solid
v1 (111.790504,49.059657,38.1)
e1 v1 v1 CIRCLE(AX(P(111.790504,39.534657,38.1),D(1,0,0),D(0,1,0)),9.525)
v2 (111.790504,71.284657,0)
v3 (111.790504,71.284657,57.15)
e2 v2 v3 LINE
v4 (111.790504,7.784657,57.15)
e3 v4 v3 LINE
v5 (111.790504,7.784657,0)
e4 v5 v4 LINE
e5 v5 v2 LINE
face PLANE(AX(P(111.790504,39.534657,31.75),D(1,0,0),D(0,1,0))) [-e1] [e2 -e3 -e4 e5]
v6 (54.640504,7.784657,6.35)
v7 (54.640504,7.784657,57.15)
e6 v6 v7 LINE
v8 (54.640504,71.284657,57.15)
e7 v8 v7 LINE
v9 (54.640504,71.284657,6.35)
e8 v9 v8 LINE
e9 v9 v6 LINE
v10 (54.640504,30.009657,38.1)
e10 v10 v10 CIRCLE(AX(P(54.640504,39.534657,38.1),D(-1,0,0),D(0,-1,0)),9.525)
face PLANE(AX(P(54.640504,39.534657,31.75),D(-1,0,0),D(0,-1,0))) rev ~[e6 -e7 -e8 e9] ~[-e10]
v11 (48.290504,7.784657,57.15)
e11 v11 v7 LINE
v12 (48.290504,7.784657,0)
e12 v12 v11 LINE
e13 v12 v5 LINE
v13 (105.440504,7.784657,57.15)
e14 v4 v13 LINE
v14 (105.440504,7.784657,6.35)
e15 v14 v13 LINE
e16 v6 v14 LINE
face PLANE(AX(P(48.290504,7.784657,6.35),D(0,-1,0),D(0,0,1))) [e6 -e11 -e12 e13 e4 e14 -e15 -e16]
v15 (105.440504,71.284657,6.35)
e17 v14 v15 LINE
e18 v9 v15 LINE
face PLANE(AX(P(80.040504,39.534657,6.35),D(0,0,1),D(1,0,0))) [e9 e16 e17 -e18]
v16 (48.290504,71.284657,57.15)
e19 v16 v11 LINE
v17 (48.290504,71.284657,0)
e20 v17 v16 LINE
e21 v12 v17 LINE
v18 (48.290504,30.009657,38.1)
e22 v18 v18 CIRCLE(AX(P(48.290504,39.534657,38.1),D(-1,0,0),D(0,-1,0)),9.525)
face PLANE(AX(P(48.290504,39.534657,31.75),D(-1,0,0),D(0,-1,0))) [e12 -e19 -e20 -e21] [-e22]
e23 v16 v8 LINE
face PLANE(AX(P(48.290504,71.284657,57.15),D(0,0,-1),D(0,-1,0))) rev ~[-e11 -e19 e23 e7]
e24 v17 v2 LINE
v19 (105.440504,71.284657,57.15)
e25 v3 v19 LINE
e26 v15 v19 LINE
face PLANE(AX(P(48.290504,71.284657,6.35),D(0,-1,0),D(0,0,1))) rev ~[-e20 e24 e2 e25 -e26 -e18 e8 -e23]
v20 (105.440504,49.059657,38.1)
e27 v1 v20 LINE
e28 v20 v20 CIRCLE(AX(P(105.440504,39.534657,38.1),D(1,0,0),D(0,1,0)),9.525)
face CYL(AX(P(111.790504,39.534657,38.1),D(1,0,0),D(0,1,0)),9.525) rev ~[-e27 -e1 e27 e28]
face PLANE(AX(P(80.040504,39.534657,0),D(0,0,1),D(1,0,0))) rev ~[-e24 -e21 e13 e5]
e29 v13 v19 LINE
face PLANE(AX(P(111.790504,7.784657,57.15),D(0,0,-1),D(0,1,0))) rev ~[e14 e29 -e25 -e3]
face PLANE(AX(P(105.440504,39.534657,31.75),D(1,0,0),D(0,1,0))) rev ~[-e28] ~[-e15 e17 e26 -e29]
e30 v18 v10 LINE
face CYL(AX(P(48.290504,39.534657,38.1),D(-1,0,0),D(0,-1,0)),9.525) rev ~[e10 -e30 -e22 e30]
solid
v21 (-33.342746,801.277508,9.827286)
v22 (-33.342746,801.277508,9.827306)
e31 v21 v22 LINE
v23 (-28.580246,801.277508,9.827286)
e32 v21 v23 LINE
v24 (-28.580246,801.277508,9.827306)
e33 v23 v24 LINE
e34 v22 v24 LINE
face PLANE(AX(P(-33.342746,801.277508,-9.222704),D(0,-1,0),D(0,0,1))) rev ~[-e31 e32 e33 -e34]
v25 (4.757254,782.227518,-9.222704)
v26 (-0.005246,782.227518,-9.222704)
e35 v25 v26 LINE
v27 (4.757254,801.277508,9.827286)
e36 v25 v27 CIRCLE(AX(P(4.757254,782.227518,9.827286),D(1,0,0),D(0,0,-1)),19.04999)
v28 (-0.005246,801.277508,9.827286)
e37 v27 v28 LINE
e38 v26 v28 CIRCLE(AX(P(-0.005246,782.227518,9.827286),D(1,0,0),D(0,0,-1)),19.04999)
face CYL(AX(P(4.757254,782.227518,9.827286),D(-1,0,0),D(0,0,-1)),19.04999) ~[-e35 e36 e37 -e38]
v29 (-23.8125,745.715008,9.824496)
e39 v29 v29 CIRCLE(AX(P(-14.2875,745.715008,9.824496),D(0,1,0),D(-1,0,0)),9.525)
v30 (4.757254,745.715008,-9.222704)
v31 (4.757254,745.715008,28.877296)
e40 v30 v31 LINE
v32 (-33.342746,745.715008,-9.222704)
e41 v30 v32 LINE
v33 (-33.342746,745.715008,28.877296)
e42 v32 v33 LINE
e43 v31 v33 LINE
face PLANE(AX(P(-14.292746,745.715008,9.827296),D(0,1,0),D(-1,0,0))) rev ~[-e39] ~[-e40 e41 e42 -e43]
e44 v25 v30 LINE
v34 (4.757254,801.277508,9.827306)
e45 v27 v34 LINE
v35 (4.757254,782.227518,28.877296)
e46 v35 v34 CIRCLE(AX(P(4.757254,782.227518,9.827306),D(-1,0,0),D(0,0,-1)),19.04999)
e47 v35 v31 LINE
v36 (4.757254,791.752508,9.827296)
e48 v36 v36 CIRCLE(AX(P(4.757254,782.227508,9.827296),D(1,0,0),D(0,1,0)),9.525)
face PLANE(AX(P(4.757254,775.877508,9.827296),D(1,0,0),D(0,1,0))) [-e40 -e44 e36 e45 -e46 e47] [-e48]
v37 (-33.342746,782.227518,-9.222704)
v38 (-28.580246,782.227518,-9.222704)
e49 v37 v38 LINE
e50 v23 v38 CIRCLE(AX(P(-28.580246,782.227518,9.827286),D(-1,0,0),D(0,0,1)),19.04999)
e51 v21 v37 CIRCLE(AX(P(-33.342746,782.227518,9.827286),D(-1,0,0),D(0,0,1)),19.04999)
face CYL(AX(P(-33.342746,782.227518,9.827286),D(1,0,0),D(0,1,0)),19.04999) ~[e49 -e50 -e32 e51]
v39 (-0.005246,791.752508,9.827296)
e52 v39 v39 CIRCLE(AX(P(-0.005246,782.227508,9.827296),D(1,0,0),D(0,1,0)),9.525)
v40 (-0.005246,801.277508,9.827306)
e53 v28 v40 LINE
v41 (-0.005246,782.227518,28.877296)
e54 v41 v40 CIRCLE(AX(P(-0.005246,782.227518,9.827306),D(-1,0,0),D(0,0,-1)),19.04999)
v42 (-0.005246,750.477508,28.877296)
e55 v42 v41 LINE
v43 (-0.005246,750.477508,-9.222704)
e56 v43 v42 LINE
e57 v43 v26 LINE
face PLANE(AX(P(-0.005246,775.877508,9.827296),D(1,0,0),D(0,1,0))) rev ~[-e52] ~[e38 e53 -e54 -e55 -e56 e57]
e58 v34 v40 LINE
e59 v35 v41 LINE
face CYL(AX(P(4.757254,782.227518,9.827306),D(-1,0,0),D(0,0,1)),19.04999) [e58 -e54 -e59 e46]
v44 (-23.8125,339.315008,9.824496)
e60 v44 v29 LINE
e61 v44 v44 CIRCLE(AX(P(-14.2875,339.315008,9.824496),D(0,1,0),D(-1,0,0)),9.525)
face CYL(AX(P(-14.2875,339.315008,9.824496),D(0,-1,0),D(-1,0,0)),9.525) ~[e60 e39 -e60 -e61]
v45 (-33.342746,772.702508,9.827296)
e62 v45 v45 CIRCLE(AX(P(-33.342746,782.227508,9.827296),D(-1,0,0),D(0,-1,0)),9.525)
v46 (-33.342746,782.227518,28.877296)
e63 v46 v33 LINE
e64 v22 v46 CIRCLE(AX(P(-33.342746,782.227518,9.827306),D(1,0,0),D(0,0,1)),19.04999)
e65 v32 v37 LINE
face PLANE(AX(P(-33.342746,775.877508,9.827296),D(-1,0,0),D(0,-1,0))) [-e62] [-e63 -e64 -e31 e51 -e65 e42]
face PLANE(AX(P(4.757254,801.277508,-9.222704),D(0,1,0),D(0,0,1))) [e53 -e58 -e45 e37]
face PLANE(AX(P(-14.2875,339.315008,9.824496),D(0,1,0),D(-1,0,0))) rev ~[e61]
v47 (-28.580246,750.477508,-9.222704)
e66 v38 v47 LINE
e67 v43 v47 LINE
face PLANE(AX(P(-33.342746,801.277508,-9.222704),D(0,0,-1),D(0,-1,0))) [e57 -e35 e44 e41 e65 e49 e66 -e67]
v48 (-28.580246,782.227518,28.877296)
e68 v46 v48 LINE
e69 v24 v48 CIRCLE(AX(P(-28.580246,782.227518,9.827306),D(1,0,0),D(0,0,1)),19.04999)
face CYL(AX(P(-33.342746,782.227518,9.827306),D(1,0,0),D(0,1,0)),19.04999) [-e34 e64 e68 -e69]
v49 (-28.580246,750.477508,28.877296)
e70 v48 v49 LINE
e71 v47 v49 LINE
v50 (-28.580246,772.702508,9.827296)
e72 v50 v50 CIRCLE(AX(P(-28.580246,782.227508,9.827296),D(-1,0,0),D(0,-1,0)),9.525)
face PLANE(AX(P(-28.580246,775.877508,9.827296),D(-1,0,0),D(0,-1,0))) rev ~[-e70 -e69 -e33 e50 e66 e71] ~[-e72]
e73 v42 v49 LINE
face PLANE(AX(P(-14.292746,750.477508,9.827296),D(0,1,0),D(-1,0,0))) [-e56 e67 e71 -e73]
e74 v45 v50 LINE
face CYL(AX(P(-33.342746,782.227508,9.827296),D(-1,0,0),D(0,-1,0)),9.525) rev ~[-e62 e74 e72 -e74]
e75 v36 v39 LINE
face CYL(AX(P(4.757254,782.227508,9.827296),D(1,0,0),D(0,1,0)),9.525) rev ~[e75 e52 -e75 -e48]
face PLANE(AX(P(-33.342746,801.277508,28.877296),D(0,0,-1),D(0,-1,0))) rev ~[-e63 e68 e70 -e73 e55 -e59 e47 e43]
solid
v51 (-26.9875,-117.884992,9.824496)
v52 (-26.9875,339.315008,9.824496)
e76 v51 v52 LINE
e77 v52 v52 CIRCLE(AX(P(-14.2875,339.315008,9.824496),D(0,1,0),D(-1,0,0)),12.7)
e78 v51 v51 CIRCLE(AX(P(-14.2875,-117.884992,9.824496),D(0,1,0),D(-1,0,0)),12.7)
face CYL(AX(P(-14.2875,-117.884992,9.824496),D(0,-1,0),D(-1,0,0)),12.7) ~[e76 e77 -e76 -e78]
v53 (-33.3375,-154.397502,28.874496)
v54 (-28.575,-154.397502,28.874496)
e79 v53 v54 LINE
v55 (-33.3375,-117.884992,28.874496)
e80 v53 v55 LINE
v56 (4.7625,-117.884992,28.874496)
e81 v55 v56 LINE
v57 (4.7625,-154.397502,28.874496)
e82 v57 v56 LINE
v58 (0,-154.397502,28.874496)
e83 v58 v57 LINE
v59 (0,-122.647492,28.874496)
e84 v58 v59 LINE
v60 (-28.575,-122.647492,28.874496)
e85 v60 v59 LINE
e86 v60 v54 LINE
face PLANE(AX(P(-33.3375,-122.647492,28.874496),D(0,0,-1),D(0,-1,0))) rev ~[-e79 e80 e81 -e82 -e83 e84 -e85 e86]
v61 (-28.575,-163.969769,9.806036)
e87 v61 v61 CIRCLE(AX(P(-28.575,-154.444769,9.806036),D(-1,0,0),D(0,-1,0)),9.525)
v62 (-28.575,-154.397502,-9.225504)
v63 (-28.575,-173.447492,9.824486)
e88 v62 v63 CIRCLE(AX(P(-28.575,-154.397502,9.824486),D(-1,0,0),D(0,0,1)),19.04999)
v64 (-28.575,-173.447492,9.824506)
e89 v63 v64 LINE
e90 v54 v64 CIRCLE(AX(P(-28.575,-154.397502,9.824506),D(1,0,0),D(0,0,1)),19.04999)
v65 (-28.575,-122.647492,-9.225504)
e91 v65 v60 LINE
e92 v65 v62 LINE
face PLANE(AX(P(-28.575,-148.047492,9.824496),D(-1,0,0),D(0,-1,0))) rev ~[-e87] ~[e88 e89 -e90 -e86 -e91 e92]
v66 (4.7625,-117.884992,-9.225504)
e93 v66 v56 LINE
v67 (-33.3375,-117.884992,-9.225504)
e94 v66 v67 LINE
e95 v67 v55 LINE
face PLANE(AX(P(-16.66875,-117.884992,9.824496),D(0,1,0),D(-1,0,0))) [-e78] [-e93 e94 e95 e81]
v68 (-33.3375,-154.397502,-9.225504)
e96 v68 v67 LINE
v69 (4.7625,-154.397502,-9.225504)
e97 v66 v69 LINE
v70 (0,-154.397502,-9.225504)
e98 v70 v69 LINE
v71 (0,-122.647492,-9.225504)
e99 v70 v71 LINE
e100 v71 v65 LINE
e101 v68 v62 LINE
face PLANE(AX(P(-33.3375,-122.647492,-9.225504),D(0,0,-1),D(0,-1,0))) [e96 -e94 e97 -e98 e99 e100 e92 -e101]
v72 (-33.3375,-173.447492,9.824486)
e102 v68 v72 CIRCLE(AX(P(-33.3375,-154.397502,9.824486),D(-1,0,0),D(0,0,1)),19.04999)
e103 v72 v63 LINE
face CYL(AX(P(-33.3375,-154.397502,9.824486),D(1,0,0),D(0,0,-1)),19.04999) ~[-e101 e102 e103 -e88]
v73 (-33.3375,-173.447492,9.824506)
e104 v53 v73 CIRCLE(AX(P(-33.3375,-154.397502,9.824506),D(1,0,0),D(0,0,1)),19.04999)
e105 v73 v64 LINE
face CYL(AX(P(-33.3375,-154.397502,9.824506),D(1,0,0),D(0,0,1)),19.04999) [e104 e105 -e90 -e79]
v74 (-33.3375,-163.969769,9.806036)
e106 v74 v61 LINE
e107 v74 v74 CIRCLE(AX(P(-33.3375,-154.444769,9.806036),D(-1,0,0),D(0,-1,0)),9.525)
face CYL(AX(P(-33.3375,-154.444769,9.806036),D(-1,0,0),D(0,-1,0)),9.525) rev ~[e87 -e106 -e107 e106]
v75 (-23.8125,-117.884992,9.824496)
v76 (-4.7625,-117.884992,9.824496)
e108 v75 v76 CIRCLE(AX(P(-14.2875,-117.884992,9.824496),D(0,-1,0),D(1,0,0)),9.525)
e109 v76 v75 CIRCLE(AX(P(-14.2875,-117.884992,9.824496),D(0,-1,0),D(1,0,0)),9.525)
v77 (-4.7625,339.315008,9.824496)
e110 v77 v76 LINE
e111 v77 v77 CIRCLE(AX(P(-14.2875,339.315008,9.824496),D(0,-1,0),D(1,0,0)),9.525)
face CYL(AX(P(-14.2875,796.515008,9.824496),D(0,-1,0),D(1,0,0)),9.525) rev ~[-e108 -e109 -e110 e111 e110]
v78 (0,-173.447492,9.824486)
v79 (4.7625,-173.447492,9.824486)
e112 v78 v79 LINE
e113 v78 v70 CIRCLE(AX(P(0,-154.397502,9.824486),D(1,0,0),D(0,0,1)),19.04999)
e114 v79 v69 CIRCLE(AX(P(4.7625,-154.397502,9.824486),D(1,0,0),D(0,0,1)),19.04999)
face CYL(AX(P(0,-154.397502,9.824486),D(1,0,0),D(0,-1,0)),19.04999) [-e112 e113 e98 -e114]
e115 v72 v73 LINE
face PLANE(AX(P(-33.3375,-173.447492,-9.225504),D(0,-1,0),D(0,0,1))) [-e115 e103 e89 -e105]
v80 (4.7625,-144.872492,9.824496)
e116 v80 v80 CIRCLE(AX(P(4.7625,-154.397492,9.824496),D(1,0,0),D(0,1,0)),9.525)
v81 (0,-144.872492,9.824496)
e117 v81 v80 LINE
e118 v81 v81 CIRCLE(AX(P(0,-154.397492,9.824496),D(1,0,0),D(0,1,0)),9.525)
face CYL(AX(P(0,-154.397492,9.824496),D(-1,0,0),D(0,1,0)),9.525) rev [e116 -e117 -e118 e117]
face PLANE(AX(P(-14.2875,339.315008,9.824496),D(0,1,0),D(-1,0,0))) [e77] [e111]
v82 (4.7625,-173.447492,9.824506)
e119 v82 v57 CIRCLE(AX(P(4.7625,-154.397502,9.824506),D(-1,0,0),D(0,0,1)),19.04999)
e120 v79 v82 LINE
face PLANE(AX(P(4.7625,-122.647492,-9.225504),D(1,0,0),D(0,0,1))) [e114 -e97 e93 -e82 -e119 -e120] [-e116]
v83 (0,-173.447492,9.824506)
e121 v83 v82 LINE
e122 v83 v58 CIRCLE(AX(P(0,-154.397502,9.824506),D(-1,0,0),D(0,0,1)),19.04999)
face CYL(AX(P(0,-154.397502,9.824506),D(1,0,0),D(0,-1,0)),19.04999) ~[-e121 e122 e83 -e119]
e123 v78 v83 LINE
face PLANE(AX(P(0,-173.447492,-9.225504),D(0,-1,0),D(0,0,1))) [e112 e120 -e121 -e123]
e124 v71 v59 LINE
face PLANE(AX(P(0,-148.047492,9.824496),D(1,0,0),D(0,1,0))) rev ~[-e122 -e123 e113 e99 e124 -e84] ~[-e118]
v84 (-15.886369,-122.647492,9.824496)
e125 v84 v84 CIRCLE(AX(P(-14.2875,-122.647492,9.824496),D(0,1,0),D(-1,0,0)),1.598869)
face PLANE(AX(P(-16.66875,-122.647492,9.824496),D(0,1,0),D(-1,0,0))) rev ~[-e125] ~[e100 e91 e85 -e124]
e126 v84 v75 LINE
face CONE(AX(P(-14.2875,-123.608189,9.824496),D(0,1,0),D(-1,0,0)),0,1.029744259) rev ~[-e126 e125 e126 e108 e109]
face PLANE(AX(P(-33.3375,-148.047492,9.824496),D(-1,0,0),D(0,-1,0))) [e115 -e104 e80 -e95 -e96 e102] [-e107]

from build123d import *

# Parameters (mm, degrees)
F0_W      = 50.8
F0_H      = 38.1
F0_R      = 9.525
F1_DEPTH  = 4.7625
F2_R      = 19.04999
F3_W      = 33.3375
F3_H      = 38.1
F3_W_2    = 4.7625
F4_DEPTH  = 4.7625
F5_W      = 50.8
F5_H      = 38.1
F5_R      = 9.525
F6_DEPTH  = 4.7625
F7_R      = 19.04999
F8_R      = 12.7
F9_DEPTH  = 457.2
F11_D     = 19.05
F11_DEPTH = 457.2
F11_TIP   = 5.7231973962
F12_R     = 9.525
F13_DEPTH = 406.4
F14_W     = 38.1
F14_H     = 38.1
F14_R     = 9.525
F15_DEPTH = 4.7625
F16_W     = 50.8
F16_H     = 38.1
F16_R     = 9.525
F17_DEPTH = 4.7625
F18_R     = 19.04999
F19_W     = 50.8
F19_H     = 38.1
F19_R     = 9.525
F20_DEPTH = 4.7625
F21_R     = 19.04999
F22_W     = 63.5
F22_H     = 63.5
F23_DEPTH = 6.35
F24_W     = 63.5
F24_H     = 50.8
F24_R     = 9.525
F25_DEPTH = 6.35
F26_W     = 63.5
F26_H     = 50.8
F26_R     = 9.525
F27_DEPTH = 6.35


# Not quite as in the source:
# - a fillet or chamfer is up to 0.001 mm smaller than in the source, because OpenCascade refuses the exact size


with BuildPart() as f1:
    # F0 (on Right) → F1 (new body)
    with BuildSketch(Plane.YZ):
        with Locations((-148.0474919081, 9.8244957626)):
            Rectangle(F0_W, F0_H)
        with Locations((-154.3974919081, 9.8244957626)):
            Circle(F0_R, mode=Mode.SUBTRACT)
    extrude(amount=F1_DEPTH)

    # F2 (radius 19.05 in the source; OpenCascade refuses exactly that, so slightly less here)
    f2_edges = [f1.edges().sort_by_distance(p)[0] for p in [
        (2.38125, -173.447492, 28.874496),
        (2.38125, -173.447492, -9.225504),
    ]]
    fillet(f2_edges, radius=F2_R)

    # F3 (on face) → F4 (join)
    with BuildSketch(Plane(origin=(0, -122.6474919081, 0), x_dir=(-1, 0, 0), z_dir=(0, 1, 0))):
        with Locations((16.66875, 9.8244957626)):
            Rectangle(F3_W, F3_H)
        with Locations((-2.38125, 9.8244957626)):
            Rectangle(F3_W_2, F3_H)
    extrude(amount=F4_DEPTH)

    # F5 (on face) → F6 (join)
    with BuildSketch(Plane(origin=(-33.3375, 0, 0), x_dir=(0, -1, 0), z_dir=(-1, 0, 0))):
        with Locations((148.0474919081, 9.8244957626)):
            Rectangle(F5_W, F5_H)
        with Locations((154.4447690248, 9.8060360178)):
            Circle(F5_R, mode=Mode.SUBTRACT)
    extrude(amount=-F6_DEPTH)

    # F7 (radius 19.05 in the source; OpenCascade refuses exactly that, so slightly less here)
    f7_edges = [f1.edges().sort_by_distance(p)[0] for p in [
        (-30.95625, -173.447492, 28.874496),
        (-30.95625, -173.447492, -9.225504),
    ]]
    fillet(f7_edges, radius=F7_R)

    # F8 (on face) → F9 (join)
    with BuildSketch(Plane(origin=(0, -117.8849919081, 0), x_dir=(-1, 0, 0), z_dir=(0, 1, 0))):
        with Locations((14.2875, 9.8244957626)):
            Circle(F8_R)
    extrude(amount=F9_DEPTH)

    # F11
    with Locations(Plane(origin=(0, 339.3150080919, 0), x_dir=(-1, 0, 0), z_dir=(0, 1, 0))):
        with Locations((14.2875, 9.8244957626)):
            Hole(F11_D / 2, depth=F11_DEPTH)
            with Locations((0, 0, -(F11_DEPTH + F11_TIP / 2))):  # 118° drill point
                Cone(0, F11_D / 2, F11_TIP, mode=Mode.SUBTRACT)


with BuildPart() as f13:
    # F12 (on face) → F13 (new body)
    with BuildSketch(Plane(origin=(0, 339.3150080919, 0), x_dir=(-1, 0, 0), z_dir=(0, 1, 0))):
        with Locations((14.2875, 9.8244957626)):
            Circle(F12_R)
    extrude(amount=F13_DEPTH)

    # F14 (on face) → F15 (join)
    with BuildSketch(Plane(origin=(0, 745.7150080919, 0), x_dir=(-1, 0, 0), z_dir=(0, 1, 0))):
        with Locations((14.2927456155, 9.8272960141)):
            Rectangle(F14_W, F14_H)
        with Locations((14.2875, 9.8244957626)):
            Circle(F14_R, mode=Mode.SUBTRACT)
        with Locations((14.2875, 9.8244957626)):
            Circle(F14_R)
    extrude(amount=F15_DEPTH)

    # F16 (on face) → F17 (join)
    with BuildSketch(Plane.YZ.offset(4.7572543845)):
        with Locations((775.8775080919, 9.8272960141)):
            Rectangle(F16_W, F16_H)
        with Locations((782.2275080919, 9.8272960141)):
            Circle(F16_R, mode=Mode.SUBTRACT)
    extrude(amount=-F17_DEPTH)

    # F18 (radius 19.05 in the source; OpenCascade refuses exactly that, so slightly less here)
    f18_edges = [f13.edges().sort_by_distance(p)[0] for p in [
        (2.376004, 801.277508, 28.877296),
        (2.376004, 801.277508, -9.222704),
    ]]
    fillet(f18_edges, radius=F18_R)

    # F19 (on face) → F20 (join)
    with BuildSketch(Plane(origin=(-33.3427456155, 0, 0), x_dir=(0, -1, 0), z_dir=(-1, 0, 0))):
        with Locations((-775.8775080919, 9.8272960141)):
            Rectangle(F19_W, F19_H)
        with Locations((-782.2275080919, 9.8272960141)):
            Circle(F19_R, mode=Mode.SUBTRACT)
    extrude(amount=-F20_DEPTH)

    # F21 (radius 19.05 in the source; OpenCascade refuses exactly that, so slightly less here)
    f21_edges = [f13.edges().sort_by_distance(p)[0] for p in [
        (-30.961496, 801.277508, 28.877296),
        (-30.961496, 801.277508, -9.222704),
    ]]
    fillet(f21_edges, radius=F21_R)


with BuildPart() as f23:
    # F22 (on Top) → F23 (new body)
    with BuildSketch(Plane.XY):
        with Locations((80.0405043066, 39.5346571803)):
            Rectangle(F22_W, F22_H)
    extrude(amount=F23_DEPTH)

    # F24 (on face) → F25 (join)
    with BuildSketch(Plane.YZ.offset(111.7905043066)):
        with Locations((39.5346571803, 31.75)):
            Rectangle(F24_W, F24_H)
        with Locations((39.5346571803, 38.1)):
            Circle(F24_R, mode=Mode.SUBTRACT)
    extrude(amount=-F25_DEPTH)

    # F26 (on face) → F27 (join)
    with BuildSketch(Plane(origin=(48.2905043066, 0, 0), x_dir=(0, -1, 0), z_dir=(-1, 0, 0))):
        with Locations((-39.5346571803, 31.75)):
            Rectangle(F26_W, F26_H)
        with Locations((-39.5346571803, 38.1)):
            Circle(F26_R, mode=Mode.SUBTRACT)
    extrude(amount=-F27_DEPTH)


solid = Compound([f1.part, f13.part, f23.part])
